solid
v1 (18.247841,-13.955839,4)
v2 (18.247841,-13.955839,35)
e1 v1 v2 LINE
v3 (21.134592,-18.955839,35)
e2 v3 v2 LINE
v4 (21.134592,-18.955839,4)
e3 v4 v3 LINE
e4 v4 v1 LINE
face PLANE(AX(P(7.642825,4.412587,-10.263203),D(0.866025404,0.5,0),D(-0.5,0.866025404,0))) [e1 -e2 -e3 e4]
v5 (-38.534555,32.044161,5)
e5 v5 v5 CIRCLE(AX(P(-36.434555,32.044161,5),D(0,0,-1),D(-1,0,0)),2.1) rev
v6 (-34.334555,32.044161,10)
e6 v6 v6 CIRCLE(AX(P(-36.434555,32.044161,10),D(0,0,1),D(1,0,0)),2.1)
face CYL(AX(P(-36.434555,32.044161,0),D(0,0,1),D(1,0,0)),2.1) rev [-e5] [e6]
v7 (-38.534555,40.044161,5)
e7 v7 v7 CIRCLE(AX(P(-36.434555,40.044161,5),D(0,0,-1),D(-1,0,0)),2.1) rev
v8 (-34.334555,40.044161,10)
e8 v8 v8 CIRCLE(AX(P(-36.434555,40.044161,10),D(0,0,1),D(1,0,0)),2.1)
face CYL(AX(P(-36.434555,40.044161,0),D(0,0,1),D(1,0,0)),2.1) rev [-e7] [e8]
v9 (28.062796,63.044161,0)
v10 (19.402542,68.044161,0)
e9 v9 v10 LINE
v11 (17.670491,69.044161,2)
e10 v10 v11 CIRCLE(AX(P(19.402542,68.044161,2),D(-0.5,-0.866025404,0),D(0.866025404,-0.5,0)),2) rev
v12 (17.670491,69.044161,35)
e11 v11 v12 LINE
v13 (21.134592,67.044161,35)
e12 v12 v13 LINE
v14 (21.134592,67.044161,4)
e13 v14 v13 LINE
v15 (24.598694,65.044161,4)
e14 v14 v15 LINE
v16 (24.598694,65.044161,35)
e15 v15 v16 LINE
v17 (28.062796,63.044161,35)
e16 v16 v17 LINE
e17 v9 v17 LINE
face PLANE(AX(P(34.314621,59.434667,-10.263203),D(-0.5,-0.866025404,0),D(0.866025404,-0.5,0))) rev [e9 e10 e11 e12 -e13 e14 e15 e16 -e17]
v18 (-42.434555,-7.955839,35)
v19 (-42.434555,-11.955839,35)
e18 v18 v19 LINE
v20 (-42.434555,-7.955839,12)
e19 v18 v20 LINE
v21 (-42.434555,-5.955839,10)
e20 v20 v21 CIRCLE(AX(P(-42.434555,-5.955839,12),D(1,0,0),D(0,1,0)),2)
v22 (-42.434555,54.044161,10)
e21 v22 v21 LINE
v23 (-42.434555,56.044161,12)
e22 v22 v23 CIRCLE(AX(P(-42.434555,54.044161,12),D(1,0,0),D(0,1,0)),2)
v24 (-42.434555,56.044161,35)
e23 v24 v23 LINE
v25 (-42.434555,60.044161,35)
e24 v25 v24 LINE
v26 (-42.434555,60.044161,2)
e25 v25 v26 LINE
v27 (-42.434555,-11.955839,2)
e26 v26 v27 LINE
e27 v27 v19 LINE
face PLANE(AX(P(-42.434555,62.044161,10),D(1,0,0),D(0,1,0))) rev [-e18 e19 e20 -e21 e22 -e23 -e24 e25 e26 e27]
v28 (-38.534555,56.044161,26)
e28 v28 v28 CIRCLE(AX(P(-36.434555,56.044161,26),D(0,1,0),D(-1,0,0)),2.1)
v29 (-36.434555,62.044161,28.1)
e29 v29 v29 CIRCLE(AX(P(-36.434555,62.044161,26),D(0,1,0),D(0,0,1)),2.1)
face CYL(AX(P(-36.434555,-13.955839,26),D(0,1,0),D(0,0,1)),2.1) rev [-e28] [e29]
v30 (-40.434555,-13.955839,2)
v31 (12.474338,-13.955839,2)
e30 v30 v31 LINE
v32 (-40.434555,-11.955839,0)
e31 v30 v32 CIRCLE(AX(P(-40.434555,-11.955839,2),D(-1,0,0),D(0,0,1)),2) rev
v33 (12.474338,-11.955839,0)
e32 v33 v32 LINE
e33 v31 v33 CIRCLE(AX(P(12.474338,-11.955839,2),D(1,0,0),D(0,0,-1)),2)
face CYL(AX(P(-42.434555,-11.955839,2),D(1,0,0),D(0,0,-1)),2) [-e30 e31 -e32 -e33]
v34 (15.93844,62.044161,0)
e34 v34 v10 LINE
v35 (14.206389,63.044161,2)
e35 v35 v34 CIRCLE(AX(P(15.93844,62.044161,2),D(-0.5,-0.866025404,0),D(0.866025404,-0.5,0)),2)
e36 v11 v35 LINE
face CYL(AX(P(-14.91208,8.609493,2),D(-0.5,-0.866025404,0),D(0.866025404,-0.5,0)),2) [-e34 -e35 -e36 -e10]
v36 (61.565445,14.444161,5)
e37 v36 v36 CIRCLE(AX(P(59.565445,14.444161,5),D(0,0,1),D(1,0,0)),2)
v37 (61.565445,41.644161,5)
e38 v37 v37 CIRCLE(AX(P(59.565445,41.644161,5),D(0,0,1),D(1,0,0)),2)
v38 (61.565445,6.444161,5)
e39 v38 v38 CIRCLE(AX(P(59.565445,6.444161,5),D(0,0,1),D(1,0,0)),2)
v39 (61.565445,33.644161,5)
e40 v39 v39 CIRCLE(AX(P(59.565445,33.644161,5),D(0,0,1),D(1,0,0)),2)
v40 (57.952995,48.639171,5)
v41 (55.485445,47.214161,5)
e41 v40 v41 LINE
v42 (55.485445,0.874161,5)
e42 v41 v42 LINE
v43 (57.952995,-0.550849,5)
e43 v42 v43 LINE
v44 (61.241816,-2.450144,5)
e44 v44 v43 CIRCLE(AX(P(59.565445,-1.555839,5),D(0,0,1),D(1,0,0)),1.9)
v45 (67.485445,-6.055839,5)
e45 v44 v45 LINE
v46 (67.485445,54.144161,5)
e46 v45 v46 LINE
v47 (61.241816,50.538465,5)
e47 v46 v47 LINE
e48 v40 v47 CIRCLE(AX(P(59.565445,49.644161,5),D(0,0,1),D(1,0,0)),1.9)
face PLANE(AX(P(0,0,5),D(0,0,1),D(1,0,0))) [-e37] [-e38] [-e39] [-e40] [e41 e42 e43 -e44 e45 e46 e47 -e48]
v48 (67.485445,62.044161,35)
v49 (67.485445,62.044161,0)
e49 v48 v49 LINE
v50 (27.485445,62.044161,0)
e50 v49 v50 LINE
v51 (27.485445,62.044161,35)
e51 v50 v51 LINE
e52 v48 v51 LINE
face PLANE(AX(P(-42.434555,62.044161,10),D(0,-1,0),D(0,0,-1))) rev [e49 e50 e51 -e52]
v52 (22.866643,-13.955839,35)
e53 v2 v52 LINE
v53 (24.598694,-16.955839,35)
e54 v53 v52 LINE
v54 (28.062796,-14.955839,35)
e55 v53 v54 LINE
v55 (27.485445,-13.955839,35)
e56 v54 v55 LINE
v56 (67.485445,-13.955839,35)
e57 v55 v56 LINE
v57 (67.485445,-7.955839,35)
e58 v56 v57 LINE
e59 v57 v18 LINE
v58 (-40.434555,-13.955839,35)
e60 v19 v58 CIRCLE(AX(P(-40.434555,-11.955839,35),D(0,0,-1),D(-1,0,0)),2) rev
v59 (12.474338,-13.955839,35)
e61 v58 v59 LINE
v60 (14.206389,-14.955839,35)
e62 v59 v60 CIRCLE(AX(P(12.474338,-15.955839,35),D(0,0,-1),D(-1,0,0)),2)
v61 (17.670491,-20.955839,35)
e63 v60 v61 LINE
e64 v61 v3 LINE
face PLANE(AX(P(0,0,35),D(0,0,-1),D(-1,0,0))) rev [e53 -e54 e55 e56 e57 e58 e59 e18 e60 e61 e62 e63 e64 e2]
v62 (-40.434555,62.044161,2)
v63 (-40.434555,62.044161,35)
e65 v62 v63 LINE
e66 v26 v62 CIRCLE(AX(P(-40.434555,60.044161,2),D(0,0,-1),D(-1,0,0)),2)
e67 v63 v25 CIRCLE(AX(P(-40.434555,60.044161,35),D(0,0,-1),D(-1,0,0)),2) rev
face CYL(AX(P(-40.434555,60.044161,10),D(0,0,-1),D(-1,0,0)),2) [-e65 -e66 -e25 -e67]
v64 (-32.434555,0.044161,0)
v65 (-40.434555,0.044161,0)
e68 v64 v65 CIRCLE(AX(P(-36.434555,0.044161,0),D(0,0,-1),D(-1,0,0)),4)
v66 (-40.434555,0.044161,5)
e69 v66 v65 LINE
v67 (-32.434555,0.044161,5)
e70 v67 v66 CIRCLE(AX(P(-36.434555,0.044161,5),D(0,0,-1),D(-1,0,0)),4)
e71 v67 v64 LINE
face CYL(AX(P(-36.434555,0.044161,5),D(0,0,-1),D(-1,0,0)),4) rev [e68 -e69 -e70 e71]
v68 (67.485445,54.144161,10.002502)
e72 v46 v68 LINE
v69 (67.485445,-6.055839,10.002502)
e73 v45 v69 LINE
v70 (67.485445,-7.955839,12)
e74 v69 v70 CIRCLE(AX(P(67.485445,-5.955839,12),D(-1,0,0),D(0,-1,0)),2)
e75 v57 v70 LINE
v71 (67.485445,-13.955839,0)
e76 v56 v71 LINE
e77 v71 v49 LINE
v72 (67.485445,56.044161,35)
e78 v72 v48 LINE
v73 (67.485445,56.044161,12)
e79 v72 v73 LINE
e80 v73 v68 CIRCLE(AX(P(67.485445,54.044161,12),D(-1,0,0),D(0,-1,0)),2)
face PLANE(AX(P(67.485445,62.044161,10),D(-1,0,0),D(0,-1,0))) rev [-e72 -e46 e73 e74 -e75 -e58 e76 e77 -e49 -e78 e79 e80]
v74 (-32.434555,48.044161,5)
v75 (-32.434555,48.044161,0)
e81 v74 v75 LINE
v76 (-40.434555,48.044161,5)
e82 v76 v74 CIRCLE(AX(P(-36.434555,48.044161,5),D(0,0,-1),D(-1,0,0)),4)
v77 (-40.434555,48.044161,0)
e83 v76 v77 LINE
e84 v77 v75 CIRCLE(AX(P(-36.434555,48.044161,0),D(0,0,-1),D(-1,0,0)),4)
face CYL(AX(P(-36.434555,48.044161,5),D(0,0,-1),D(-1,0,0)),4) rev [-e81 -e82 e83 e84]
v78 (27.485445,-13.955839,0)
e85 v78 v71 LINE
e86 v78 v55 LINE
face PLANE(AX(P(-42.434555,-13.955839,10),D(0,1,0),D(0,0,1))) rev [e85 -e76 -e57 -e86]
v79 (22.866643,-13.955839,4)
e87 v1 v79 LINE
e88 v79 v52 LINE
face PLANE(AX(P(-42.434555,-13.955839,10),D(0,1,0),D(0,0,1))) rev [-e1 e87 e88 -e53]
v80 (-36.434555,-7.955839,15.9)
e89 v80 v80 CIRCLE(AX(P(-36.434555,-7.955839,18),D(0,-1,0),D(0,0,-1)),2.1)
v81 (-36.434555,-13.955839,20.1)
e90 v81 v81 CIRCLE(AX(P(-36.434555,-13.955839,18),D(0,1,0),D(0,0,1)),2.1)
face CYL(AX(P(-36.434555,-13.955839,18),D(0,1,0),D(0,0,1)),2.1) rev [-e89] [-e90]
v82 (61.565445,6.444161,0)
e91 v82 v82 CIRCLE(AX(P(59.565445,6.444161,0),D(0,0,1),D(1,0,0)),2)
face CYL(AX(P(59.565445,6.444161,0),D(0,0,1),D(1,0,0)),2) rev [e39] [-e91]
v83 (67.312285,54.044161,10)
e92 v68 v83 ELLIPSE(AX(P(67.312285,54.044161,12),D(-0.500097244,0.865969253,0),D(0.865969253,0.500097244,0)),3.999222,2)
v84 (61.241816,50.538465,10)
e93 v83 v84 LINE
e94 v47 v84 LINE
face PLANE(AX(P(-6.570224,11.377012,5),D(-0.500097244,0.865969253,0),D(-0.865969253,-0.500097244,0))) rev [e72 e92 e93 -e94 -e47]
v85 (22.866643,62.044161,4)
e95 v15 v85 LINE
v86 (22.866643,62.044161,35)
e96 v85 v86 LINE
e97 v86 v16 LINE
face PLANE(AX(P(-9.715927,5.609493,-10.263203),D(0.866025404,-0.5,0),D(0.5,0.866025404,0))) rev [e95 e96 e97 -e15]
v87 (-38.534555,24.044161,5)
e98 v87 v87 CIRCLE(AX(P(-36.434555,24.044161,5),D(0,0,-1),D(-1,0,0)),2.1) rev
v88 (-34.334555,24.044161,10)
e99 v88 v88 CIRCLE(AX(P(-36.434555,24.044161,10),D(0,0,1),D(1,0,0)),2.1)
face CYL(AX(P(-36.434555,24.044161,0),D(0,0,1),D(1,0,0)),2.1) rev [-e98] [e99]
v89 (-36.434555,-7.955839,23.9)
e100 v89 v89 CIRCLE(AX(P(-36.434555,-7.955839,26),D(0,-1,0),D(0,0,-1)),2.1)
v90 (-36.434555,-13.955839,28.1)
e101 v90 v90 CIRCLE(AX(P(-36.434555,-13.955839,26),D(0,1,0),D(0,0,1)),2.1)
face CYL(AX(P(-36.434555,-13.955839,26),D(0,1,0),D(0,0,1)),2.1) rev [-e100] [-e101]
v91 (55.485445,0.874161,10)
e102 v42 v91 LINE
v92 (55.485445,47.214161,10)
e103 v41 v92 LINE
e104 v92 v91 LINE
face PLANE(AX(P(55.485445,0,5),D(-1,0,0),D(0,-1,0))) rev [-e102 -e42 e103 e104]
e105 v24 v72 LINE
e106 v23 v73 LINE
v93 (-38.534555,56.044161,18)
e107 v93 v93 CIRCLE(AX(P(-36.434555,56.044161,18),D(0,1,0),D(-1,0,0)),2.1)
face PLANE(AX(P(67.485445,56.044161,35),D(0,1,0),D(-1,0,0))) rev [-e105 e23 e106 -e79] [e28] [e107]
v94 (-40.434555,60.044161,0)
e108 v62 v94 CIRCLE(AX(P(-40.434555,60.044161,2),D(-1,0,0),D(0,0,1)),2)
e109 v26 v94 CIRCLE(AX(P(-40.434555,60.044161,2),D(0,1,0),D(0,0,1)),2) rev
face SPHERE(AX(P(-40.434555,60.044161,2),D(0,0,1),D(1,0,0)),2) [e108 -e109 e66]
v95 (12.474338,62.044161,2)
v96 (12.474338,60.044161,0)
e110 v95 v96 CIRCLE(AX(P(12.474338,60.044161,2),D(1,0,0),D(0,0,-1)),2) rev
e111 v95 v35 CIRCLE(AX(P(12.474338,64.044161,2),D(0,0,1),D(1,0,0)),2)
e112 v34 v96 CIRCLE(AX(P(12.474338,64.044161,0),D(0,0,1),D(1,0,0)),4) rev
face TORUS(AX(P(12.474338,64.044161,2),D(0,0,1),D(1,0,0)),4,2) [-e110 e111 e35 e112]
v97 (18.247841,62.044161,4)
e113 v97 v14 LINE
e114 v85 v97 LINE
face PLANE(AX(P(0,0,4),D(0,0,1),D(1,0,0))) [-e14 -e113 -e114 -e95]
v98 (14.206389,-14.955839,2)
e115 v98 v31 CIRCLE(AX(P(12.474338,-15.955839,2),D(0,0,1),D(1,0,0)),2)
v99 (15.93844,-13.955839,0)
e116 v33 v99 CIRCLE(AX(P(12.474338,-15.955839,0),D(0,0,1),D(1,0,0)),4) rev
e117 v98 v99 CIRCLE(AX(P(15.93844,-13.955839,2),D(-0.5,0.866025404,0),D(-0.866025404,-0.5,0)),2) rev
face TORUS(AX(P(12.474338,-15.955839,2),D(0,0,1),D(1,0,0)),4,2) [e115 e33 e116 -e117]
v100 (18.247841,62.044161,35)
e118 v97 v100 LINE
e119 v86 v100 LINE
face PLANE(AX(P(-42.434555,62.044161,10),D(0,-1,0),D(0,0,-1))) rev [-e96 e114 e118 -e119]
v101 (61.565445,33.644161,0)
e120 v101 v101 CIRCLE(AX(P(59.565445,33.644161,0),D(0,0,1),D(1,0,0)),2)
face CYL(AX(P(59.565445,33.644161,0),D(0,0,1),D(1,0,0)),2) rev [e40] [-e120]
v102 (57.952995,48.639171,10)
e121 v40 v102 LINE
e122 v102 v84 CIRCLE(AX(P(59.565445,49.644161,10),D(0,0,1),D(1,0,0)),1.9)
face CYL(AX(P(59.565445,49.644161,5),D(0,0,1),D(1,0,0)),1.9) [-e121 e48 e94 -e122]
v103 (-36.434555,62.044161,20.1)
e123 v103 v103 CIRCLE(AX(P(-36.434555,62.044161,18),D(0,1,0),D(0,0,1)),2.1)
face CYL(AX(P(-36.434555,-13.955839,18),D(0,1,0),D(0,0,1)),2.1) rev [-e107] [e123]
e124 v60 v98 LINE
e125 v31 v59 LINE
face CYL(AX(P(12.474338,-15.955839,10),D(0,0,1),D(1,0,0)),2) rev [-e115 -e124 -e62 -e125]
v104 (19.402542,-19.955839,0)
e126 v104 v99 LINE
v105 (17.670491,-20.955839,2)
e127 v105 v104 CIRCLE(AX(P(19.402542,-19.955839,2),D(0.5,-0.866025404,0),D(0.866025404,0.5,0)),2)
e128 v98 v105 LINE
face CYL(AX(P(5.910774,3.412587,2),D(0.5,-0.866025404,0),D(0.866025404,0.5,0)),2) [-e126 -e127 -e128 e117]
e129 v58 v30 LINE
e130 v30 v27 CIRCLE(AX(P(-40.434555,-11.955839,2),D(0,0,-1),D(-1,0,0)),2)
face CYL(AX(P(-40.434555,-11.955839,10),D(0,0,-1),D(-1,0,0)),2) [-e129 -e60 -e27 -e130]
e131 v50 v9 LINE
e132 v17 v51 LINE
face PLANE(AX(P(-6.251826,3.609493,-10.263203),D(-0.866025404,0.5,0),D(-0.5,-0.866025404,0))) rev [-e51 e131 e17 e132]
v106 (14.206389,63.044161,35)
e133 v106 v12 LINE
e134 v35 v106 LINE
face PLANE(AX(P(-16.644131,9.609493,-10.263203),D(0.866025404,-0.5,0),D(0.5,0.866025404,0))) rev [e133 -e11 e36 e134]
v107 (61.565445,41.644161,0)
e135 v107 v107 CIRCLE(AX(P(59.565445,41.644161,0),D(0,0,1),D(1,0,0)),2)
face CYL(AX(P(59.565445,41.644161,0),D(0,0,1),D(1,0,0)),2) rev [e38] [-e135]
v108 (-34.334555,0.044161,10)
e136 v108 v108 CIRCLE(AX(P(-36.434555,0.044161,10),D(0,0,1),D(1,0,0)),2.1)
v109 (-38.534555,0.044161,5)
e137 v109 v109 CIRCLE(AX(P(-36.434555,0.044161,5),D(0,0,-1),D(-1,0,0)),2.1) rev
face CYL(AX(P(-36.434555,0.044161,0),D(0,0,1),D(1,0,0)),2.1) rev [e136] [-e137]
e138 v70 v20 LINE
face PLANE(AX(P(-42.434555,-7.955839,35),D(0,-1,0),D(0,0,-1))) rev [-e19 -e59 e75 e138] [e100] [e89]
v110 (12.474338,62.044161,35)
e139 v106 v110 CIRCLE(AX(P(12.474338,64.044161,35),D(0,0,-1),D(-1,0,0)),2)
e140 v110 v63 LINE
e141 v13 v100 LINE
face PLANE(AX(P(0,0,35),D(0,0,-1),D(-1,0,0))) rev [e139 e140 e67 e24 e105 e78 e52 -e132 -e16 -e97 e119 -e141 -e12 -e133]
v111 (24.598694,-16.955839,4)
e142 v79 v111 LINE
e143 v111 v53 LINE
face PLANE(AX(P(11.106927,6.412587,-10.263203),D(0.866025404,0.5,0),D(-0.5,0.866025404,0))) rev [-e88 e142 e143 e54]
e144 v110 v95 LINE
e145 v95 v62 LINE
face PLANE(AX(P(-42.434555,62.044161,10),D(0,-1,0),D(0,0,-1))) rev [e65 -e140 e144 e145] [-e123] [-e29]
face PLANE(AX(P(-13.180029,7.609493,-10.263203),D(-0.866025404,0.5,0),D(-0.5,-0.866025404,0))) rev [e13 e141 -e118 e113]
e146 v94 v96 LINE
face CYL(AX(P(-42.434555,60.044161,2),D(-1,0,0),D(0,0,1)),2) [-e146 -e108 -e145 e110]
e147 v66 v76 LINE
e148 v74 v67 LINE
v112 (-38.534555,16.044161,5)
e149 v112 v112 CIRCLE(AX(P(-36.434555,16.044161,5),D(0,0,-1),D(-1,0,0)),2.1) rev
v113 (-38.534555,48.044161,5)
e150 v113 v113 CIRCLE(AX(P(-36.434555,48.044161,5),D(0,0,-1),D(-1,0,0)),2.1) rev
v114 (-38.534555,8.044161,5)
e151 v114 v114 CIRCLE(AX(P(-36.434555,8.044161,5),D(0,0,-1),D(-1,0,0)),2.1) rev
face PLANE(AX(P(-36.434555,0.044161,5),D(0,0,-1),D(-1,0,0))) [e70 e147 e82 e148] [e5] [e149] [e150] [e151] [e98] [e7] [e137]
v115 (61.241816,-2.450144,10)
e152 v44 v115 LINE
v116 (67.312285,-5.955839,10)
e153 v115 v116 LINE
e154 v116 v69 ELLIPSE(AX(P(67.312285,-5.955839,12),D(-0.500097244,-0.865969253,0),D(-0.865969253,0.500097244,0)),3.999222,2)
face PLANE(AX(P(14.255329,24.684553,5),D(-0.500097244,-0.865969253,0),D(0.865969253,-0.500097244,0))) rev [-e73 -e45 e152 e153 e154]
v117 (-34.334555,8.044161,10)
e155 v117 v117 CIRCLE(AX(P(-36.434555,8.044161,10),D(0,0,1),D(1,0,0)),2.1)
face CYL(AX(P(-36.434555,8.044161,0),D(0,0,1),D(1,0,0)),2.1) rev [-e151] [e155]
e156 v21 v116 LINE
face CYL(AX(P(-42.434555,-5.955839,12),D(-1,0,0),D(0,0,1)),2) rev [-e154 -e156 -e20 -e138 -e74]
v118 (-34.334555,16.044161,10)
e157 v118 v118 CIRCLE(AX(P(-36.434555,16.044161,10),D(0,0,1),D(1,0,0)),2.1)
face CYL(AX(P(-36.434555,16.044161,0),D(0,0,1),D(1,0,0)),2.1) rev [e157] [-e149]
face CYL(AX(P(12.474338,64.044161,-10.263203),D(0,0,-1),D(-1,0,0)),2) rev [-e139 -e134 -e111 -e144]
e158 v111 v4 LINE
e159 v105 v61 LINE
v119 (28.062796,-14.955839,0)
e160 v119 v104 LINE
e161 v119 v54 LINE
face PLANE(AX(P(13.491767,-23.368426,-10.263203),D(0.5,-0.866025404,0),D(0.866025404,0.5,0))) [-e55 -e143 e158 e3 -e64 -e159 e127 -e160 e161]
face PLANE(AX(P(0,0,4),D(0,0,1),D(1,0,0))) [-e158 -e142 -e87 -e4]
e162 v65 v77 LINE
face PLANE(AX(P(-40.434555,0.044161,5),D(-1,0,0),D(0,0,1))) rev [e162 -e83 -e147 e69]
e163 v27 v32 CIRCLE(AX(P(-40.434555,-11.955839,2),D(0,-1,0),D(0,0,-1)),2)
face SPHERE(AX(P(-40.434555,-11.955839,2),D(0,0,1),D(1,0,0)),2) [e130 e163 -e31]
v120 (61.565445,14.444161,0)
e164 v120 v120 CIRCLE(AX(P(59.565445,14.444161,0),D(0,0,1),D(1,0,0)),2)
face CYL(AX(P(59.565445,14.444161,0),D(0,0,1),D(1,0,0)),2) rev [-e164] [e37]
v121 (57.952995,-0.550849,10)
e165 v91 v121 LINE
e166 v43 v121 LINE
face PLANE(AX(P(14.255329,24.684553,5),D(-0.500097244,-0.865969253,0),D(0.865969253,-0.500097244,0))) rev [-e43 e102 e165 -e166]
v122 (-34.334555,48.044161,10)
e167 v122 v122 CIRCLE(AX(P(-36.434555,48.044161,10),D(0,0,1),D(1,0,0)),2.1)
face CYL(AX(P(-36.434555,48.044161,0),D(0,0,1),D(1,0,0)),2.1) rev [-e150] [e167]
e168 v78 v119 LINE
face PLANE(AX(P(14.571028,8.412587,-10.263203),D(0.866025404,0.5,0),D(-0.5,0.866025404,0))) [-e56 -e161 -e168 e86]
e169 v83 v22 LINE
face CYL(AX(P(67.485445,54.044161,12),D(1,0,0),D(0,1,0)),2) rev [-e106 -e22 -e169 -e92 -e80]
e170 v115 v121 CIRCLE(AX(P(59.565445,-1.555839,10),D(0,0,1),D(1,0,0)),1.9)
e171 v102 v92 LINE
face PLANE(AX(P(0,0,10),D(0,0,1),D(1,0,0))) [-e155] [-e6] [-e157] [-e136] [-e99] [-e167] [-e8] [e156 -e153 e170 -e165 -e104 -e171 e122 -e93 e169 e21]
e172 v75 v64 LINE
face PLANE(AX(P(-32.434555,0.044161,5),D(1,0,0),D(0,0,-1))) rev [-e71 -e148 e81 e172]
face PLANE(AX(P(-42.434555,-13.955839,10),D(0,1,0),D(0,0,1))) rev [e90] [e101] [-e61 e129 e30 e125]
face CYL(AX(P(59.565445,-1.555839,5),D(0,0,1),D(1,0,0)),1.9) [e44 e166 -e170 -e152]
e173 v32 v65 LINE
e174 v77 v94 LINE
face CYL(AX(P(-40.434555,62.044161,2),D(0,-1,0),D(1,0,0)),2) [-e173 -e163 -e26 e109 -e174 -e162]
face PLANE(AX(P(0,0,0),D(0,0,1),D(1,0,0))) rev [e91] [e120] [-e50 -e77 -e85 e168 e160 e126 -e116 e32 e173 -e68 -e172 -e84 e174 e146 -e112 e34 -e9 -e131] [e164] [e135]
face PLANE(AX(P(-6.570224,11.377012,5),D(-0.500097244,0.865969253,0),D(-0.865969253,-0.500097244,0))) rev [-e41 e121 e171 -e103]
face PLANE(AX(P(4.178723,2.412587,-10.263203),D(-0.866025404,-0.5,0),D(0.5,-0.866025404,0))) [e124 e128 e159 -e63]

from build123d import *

# Parameters (mm, degrees)
SKETCH_2_W               = 109.92
SKETCH_2_H               = 76
EXTRUDE_1_DEPTH          = 10
CUT_EXTRUDE_1_DEPTH      = 5
SKETCH_4_R               = 2
CUT_EXTRUDE_2_DEPTH      = 92.808295873
SKETCH_5_W               = 109.92
SKETCH_5_H               = 6
EXTRUDE_2_DEPTH          = 25
CUT_EXTRUDE_3_DEPTH      = 104.340627651
CUT_EXTRUDE_3_DEPTH_BACK = 104.340627651
SKETCH_7_R               = 2.1
SKETCH_9_R               = 2.1
CUT_EXTRUDE_4_DEPTH      = 96.019804204
CUT_EXTRUDE_5_DEPTH      = 5
EXTRUDE_3_DEPTH          = 35
FILLET_1_R               = 2
EXTRUDE_4_DEPTH          = 4


with BuildPart() as part:
    # 草圖2 → 填料-伸長1 (new body)
    with BuildSketch(Plane.XY):
        with Locations((12.52544527, 24.044160626)):
            Rectangle(SKETCH_2_W, SKETCH_2_H)
    extrude(amount=EXTRUDE_1_DEPTH)

    # 草圖3 → 除料-伸長1 (cut)
    with BuildSketch(Plane.XY.offset(10)):
        with BuildLine():
            Line((67.48544527, -6.055839374), (67.48544527, 54.144160626))
            Line((67.48544527, 54.144160626), (61.24181631, 50.538464901))
            ThreePointArc((61.24181631, 50.538464901), (61.408690367, 50.105080914), (61.46544527, 49.644160626))
            ThreePointArc((61.46544527, 49.644160626), (60.088104264, 47.81746208), (57.95299519, 48.639170705))
            Line((57.95299519, 48.639170705), (55.48544527, 47.214160626))
            Line((55.48544527, 47.214160626), (55.48544527, 0.874160626))
            Line((55.48544527, 0.874160626), (57.95299519, -0.550849453))
            ThreePointArc((57.95299519, -0.550849453), (60.088104264, 0.270859171), (61.46544527, -1.555839374))
            ThreePointArc((61.46544527, -1.555839374), (61.408690367, -2.016759663), (61.24181631, -2.45014365))
            Line((61.24181631, -2.45014365), (67.48544527, -6.055839374))
        make_face()
    extrude(amount=-CUT_EXTRUDE_1_DEPTH, mode=Mode.SUBTRACT)

    # 草圖4 → 除料-伸長2 (cut, through all)
    with BuildSketch(Plane.XY.offset(5)):
        with Locations((59.56544527, 41.644160626)):
            Circle(SKETCH_4_R)
        with Locations((59.56544527, 33.644160626)):
            Circle(SKETCH_4_R)
        with Locations((59.56544527, 6.444160626)):
            Circle(SKETCH_4_R)
        with Locations((59.56544527, 14.444160626)):
            Circle(SKETCH_4_R)
    extrude(amount=-CUT_EXTRUDE_2_DEPTH, mode=Mode.SUBTRACT)

    # 草圖5 → 填料-伸長2 (add)
    with BuildSketch(Plane.XY.offset(10)):
        with Locations((12.52544527, -10.955839374)):
            Rectangle(SKETCH_5_W, SKETCH_5_H)
        with Locations((12.52544527, 59.044160626)):
            Rectangle(SKETCH_5_W, SKETCH_5_H)
    extrude(amount=EXTRUDE_2_DEPTH)

    # 草圖7 → 除料-伸長3 (cut, two sides: drawn at the far end of the back side and taken through both)
    with BuildSketch(Plane(origin=(0, -7.955839374, 0), x_dir=(1, 0, 0), z_dir=(0, 1, 0)).offset(-CUT_EXTRUDE_3_DEPTH_BACK)):
        with Locations(Location((-36.43455473, -18, 0), (0, 0, 270))):
            Circle(SKETCH_7_R)
        with Locations(Location((-36.43455473, -26, 0), (0, 0, 270))):
            Circle(SKETCH_7_R)
    extrude(amount=CUT_EXTRUDE_3_DEPTH + CUT_EXTRUDE_3_DEPTH_BACK, mode=Mode.SUBTRACT)

    # 草圖9 → 除料-伸長4 (cut, through all)
    with BuildSketch(Plane.XY.offset(10)):
        with Locations((-36.43455473, 0.044160626)):
            Circle(SKETCH_9_R)
        with Locations((-36.43455473, 8.044160626)):
            Circle(SKETCH_9_R)
        with Locations((-36.43455473, 16.044160626)):
            Circle(SKETCH_9_R)
        with Locations((-36.43455473, 24.044160626)):
            Circle(SKETCH_9_R)
        with Locations((-36.43455473, 32.044160626)):
            Circle(SKETCH_9_R)
        with Locations((-36.43455473, 40.044160626)):
            Circle(SKETCH_9_R)
        with Locations((-36.43455473, 48.044160626)):
            Circle(SKETCH_9_R)
    extrude(amount=-CUT_EXTRUDE_4_DEPTH, mode=Mode.SUBTRACT)

    # 草圖10 → 除料-伸長5 (cut)
    with BuildSketch(Plane(origin=(0, 0, 0), x_dir=(-1, 0, 0), z_dir=(0, 0, -1))):
        with BuildLine():
            Line((32.43455473, 0.044160626), (32.43455473, 48.044160626))
            ThreePointArc((32.43455473, 48.044160626), (36.43455473, 52.044160626), (40.43455473, 48.044160626))
            Line((40.43455473, 48.044160626), (40.43455473, 0.044160626))
            ThreePointArc((40.43455473, 0.044160626), (36.43455473, -3.955839374), (32.43455473, 0.044160626))
        make_face()
    extrude(amount=-CUT_EXTRUDE_5_DEPTH, mode=Mode.SUBTRACT)

    # 草圖12 → 填料-伸長3 (add)
    with BuildSketch(Plane.XY.offset(35)):
        Polygon((17.670490694, 69.044160626), (13.629038809, 62.044160626), (18.247840963, 62.044160626), (21.134592309, 67.044160626), align=None)
        Polygon((24.598693924, 65.044160626), (22.866643116, 62.044160626), (27.48544527, 62.044160626), (28.062795539, 63.044160626), align=None)
        Polygon((18.247840963, -13.955839374), (13.629038809, -13.955839374), (17.670490694, -20.955839374), (21.134592309, -18.955839374), align=None)
        Polygon((27.48544527, -13.955839374), (22.866643116, -13.955839374), (24.598693924, -16.955839374), (28.062795539, -14.955839374), align=None)
    extrude(amount=-EXTRUDE_3_DEPTH)

    # 圓角1
    fillet_1_edges = [part.edges().sort_by_distance(p)[0] for p in [
        (12.52544527, 56.044160626, 10),
        (12.52544527, -7.955839374, 10),
        (-42.43455473, 62.044160626, 17.5),
        (-42.43455473, -13.955839374, 17.5),
        (-42.43455473, 24.044160626, 0),
        (-14.40275796, -13.955839374, 0),
        (15.649764752, -17.455839374, 0),
        (15.649764752, 65.544160626, 0),
        (13.629038809, -13.955839374, 17.5),
        (13.629038809, 62.044160626, 17.5),
        (-14.40275796, 62.044160626, 0),
    ]]
    fillet(fillet_1_edges, radius=FILLET_1_R - 0.0001)  # a hair under: the kernel refuses the full size

    # 草圖13 → 填料-伸長4 (add)
    with BuildSketch(Plane(origin=(0, 0, 0), x_dir=(-1, 0, 0), z_dir=(0, 0, -1))):
        Polygon((-21.134592309, -18.955839374), (-24.598693924, -16.955839374), (-22.866643116, -13.955839374), (-18.247840963, -13.955839374), align=None)
        Polygon((-22.866643116, 62.044160626), (-24.598693924, 65.044160626), (-21.134592309, 67.044160626), (-18.247840963, 62.044160626), align=None)
    extrude(amount=-EXTRUDE_4_DEPTH)


solid = part.part
